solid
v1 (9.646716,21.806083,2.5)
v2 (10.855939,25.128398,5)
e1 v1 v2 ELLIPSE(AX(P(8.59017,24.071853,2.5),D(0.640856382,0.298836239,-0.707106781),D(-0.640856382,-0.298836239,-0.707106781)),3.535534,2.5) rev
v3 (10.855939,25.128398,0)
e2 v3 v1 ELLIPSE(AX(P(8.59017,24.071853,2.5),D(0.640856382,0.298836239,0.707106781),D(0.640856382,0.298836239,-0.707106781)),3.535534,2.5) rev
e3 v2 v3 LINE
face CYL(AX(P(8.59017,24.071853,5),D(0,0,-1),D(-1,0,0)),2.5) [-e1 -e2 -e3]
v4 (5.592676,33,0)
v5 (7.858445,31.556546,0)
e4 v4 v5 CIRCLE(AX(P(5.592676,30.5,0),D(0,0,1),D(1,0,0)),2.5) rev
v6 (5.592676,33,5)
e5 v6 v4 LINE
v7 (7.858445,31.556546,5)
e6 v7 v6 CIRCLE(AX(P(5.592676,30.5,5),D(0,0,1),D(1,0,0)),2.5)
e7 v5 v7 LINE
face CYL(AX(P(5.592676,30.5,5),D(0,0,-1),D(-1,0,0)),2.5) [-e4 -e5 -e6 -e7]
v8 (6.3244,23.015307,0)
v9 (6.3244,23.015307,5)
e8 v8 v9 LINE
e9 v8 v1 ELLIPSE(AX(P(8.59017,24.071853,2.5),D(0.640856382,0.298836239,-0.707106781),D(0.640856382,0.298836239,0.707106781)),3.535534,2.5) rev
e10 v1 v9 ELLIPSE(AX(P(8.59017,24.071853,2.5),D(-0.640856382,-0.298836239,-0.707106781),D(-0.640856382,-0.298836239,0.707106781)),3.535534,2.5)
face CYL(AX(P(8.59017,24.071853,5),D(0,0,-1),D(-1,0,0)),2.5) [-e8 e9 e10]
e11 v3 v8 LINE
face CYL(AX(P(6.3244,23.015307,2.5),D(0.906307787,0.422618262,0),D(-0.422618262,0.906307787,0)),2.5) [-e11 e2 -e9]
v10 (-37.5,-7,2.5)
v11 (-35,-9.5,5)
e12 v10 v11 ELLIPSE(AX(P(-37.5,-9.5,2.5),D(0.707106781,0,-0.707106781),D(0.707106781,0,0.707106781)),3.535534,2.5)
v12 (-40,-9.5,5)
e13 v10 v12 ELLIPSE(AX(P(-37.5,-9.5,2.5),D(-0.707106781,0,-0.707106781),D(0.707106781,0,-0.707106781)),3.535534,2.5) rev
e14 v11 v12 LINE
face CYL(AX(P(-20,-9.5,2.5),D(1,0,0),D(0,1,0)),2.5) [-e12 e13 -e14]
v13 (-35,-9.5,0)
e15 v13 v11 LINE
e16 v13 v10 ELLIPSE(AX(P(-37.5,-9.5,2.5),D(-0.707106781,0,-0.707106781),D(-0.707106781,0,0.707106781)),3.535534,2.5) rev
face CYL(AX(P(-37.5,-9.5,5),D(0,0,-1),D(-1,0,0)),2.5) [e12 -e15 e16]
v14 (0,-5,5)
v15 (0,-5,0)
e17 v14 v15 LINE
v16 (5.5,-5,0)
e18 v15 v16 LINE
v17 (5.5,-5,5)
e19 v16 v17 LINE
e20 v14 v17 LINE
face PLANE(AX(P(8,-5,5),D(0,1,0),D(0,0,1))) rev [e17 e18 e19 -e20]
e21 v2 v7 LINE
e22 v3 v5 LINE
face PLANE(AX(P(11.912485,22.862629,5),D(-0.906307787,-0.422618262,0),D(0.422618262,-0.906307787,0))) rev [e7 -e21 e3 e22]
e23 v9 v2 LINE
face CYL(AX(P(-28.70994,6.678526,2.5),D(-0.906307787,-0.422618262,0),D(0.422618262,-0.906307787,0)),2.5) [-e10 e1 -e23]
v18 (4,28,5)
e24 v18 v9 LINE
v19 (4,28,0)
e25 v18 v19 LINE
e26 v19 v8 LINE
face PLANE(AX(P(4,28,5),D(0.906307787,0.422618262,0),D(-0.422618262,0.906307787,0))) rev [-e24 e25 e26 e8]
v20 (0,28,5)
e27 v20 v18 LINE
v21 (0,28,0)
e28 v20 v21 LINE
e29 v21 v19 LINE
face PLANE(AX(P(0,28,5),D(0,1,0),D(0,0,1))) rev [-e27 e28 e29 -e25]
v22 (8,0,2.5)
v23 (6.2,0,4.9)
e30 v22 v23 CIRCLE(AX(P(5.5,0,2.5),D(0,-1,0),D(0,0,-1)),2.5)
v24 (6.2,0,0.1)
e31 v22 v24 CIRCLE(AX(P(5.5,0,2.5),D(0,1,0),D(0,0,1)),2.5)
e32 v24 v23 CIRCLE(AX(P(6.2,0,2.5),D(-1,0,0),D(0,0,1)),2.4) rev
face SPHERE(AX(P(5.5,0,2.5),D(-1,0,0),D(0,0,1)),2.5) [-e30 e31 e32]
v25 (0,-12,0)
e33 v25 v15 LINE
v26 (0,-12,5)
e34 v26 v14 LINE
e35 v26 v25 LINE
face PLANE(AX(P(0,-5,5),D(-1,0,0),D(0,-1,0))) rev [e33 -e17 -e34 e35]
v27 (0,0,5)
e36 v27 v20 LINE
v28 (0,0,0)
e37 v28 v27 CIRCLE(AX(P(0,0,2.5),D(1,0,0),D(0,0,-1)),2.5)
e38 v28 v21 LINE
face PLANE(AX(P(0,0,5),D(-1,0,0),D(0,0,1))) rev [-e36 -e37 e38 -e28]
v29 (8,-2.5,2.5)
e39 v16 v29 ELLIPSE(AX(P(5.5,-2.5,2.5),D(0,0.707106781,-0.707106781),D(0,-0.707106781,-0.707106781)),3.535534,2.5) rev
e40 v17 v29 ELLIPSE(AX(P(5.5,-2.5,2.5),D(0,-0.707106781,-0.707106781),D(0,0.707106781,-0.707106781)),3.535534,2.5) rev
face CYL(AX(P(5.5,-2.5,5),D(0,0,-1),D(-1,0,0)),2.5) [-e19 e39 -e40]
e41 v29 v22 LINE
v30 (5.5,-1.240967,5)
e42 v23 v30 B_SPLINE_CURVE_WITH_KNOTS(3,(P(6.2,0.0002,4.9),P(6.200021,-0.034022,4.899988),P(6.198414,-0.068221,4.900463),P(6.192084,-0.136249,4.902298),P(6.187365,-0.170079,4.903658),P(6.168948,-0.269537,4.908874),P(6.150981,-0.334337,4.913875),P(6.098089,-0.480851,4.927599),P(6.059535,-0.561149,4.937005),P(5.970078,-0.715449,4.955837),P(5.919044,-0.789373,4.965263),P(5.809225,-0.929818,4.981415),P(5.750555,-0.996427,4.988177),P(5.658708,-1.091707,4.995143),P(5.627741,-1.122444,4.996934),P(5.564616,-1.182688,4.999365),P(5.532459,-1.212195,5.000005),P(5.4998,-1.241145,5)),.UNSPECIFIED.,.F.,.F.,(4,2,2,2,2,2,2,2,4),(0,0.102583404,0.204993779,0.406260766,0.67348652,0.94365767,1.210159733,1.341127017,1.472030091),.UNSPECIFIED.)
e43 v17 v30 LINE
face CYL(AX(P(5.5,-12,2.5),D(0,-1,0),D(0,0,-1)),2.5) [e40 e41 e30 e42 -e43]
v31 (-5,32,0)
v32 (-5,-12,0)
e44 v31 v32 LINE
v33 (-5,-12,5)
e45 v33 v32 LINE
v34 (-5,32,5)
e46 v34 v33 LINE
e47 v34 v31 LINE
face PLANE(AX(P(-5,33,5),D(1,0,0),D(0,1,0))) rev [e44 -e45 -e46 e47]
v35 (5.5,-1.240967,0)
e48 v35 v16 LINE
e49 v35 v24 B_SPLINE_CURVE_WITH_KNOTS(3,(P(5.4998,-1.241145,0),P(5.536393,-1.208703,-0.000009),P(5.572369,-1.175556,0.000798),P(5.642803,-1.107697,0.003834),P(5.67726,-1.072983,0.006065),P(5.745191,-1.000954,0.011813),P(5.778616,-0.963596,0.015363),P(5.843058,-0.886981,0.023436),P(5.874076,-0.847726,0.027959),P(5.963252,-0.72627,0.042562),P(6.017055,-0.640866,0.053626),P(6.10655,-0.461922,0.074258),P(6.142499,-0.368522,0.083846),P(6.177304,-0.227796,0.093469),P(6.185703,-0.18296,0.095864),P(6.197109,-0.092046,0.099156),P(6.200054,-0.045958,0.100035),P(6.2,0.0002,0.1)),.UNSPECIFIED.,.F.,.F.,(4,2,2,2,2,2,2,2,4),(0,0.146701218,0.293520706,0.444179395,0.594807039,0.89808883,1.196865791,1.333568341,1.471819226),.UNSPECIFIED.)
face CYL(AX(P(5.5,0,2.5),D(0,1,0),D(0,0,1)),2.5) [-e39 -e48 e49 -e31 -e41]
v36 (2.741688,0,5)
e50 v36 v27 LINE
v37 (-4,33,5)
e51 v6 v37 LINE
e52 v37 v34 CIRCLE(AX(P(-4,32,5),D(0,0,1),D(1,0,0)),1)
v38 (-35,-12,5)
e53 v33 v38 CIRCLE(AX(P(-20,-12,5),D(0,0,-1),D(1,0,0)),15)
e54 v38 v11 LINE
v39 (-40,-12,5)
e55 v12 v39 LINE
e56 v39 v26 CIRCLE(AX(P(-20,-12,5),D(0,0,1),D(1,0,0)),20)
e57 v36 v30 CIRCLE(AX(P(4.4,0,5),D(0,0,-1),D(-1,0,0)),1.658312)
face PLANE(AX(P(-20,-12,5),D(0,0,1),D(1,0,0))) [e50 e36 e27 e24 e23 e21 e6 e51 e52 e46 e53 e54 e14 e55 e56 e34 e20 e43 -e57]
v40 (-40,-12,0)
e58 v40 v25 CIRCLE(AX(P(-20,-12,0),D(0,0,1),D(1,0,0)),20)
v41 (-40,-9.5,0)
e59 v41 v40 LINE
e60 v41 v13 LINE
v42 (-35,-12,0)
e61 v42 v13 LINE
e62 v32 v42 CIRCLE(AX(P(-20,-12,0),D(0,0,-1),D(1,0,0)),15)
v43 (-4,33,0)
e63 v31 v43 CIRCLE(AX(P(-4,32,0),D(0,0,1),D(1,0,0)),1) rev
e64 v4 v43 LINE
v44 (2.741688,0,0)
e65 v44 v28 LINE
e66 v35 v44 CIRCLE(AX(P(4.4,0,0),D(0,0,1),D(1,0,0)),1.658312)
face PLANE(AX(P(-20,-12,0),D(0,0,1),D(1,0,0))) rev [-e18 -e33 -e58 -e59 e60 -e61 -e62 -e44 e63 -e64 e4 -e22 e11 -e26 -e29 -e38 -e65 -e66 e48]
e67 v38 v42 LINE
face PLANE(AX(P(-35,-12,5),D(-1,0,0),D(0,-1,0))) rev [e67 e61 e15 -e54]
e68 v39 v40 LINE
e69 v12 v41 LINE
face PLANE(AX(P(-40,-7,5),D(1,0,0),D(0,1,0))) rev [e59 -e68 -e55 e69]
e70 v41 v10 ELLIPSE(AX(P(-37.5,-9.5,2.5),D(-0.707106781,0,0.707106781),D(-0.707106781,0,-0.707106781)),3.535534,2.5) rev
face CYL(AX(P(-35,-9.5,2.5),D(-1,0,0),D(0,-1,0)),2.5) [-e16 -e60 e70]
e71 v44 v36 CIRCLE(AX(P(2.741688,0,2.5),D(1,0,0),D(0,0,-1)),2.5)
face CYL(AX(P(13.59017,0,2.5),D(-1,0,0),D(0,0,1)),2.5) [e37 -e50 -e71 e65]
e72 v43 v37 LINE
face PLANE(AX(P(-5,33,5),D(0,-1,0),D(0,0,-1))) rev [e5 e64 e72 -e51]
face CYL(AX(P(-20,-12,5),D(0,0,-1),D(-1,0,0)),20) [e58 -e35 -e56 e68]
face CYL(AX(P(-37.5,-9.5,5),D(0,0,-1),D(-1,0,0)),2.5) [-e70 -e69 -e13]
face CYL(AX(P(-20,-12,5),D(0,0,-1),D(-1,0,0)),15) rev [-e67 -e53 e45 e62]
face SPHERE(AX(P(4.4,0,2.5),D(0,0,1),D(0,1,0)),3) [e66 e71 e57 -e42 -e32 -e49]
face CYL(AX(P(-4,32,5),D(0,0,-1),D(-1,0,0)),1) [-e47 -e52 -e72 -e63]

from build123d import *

# Parameters (mm, degrees)
EXTRUDE_1_DEPTH     = 5
FILLET_1_R          = 2.5
FILLET_2_R          = 1
EXTRUDE_2_DEPTH     = 8
FILLET_3_R          = 2.5
SKETCH_5_W          = 1.467751534
SKETCH_5_H          = 4.178210798
SKETCH_5_W_2        = 1.389566385
CUT_EXTRUDE_1_DEPTH = 20


with BuildPart() as part:
    # 草图1 → 凸台-拉伸1 (new body)
    with BuildSketch(Plane.XY):
        with BuildLine():
            Line((0, 0), (0, 28))
            Line((0, 28), (4, 28))
            Line((4, 28), (7.380946094, 20.749537704))
            Line((7.380946094, 20.749537704), (11.912485029, 22.862629012))
            Line((11.912485029, 22.862629012), (7.185351304, 33))
            Line((7.185351304, 33), (-5, 33))
            Line((-5, 33), (-5, -12))
            ThreePointArc((-5, -12), (-20, -27), (-35, -12))
            Line((-35, -12), (-35, -7))
            Line((-35, -7), (-40, -7))
            Line((-40, -7), (-40, -12))
            ThreePointArc((-40, -12), (-20, -32), (0, -12))
            Line((0, -12), (0, -5))
            Line((0, -5), (8, -5))
            Line((8, -5), (8, 0))
            Line((8, 0), (0, 0))
        make_face()
    extrude(amount=EXTRUDE_1_DEPTH)

    # 圆角1
    fillet_1_edges = [part.edges().sort_by_distance(p)[0] for p in [
        (-37.5, -7, 0),
        (9.646715562, 21.806083358, 0),
        (9.646715562, 21.806083358, 5),
        (-40, -7, 2.5),
        (-35, -7, 2.5),
        (7.185351304, 33, 2.5),
        (11.912485029, 22.862629012, 2.5),
        (7.380946094, 20.749537704, 2.5),
        (-37.5, -7, 5),
    ]]
    fillet(fillet_1_edges, radius=FILLET_1_R - 0.0001)  # a hair under: the kernel refuses the full size

    # 圆角2
    fillet_2_edges = [part.edges().sort_by_distance(p)[0] for p in [
        (-5, 33, 2.5),
    ]]
    fillet(fillet_2_edges, radius=FILLET_2_R)

    # 草图3 → 凸台-拉伸2 (add)
    with BuildSketch(Plane(origin=(0, 0, 0), x_dir=(0, 0, -1), z_dir=(1, 0, 0))):
        with BuildLine():
            Line((-5, 0), (0, 0))
            ThreePointArc((0, 0), (-2.5, 2.5), (-5, 0))
        make_face()
    extrude(amount=EXTRUDE_2_DEPTH)

    # 圆角3
    fillet_3_edges = [part.edges().sort_by_distance(p)[0] for p in [
        (8, -2.5, 0),
        (8, -5, 2.5),
        (8, -2.5, 5),
        (8, 2.5, 2.5),
    ]]
    fillet(fillet_3_edges, radius=FILLET_3_R - 0.0001)  # a hair under: the kernel refuses the full size

    # 草图4 → 旋转3 (revolve)
    with BuildSketch(Plane(origin=(4.4, 0, 0), x_dir=(0, 0, -1), z_dir=(1, 0, 0))):
        with BuildLine():
            Line((-5.5, 0), (0.5, 0))
            ThreePointArc((0.5, 0), (-2.5, 3), (-5.5, 0))
        make_face()
    revolve(axis=Axis((4.4, 0, 2.5), (0, 0, -1)))

    # 草图5 → 切除-拉伸1 (cut)
    with BuildSketch(Plane.ZY.offset(5)):
        with Locations((-0.733875767, -0.010051234)):
            Rectangle(SKETCH_5_W, SKETCH_5_H)
        with Locations((5.694783193, -0.010051234)):
            Rectangle(SKETCH_5_W_2, SKETCH_5_H)
    extrude(amount=-CUT_EXTRUDE_1_DEPTH, mode=Mode.SUBTRACT)


solid = part.part
